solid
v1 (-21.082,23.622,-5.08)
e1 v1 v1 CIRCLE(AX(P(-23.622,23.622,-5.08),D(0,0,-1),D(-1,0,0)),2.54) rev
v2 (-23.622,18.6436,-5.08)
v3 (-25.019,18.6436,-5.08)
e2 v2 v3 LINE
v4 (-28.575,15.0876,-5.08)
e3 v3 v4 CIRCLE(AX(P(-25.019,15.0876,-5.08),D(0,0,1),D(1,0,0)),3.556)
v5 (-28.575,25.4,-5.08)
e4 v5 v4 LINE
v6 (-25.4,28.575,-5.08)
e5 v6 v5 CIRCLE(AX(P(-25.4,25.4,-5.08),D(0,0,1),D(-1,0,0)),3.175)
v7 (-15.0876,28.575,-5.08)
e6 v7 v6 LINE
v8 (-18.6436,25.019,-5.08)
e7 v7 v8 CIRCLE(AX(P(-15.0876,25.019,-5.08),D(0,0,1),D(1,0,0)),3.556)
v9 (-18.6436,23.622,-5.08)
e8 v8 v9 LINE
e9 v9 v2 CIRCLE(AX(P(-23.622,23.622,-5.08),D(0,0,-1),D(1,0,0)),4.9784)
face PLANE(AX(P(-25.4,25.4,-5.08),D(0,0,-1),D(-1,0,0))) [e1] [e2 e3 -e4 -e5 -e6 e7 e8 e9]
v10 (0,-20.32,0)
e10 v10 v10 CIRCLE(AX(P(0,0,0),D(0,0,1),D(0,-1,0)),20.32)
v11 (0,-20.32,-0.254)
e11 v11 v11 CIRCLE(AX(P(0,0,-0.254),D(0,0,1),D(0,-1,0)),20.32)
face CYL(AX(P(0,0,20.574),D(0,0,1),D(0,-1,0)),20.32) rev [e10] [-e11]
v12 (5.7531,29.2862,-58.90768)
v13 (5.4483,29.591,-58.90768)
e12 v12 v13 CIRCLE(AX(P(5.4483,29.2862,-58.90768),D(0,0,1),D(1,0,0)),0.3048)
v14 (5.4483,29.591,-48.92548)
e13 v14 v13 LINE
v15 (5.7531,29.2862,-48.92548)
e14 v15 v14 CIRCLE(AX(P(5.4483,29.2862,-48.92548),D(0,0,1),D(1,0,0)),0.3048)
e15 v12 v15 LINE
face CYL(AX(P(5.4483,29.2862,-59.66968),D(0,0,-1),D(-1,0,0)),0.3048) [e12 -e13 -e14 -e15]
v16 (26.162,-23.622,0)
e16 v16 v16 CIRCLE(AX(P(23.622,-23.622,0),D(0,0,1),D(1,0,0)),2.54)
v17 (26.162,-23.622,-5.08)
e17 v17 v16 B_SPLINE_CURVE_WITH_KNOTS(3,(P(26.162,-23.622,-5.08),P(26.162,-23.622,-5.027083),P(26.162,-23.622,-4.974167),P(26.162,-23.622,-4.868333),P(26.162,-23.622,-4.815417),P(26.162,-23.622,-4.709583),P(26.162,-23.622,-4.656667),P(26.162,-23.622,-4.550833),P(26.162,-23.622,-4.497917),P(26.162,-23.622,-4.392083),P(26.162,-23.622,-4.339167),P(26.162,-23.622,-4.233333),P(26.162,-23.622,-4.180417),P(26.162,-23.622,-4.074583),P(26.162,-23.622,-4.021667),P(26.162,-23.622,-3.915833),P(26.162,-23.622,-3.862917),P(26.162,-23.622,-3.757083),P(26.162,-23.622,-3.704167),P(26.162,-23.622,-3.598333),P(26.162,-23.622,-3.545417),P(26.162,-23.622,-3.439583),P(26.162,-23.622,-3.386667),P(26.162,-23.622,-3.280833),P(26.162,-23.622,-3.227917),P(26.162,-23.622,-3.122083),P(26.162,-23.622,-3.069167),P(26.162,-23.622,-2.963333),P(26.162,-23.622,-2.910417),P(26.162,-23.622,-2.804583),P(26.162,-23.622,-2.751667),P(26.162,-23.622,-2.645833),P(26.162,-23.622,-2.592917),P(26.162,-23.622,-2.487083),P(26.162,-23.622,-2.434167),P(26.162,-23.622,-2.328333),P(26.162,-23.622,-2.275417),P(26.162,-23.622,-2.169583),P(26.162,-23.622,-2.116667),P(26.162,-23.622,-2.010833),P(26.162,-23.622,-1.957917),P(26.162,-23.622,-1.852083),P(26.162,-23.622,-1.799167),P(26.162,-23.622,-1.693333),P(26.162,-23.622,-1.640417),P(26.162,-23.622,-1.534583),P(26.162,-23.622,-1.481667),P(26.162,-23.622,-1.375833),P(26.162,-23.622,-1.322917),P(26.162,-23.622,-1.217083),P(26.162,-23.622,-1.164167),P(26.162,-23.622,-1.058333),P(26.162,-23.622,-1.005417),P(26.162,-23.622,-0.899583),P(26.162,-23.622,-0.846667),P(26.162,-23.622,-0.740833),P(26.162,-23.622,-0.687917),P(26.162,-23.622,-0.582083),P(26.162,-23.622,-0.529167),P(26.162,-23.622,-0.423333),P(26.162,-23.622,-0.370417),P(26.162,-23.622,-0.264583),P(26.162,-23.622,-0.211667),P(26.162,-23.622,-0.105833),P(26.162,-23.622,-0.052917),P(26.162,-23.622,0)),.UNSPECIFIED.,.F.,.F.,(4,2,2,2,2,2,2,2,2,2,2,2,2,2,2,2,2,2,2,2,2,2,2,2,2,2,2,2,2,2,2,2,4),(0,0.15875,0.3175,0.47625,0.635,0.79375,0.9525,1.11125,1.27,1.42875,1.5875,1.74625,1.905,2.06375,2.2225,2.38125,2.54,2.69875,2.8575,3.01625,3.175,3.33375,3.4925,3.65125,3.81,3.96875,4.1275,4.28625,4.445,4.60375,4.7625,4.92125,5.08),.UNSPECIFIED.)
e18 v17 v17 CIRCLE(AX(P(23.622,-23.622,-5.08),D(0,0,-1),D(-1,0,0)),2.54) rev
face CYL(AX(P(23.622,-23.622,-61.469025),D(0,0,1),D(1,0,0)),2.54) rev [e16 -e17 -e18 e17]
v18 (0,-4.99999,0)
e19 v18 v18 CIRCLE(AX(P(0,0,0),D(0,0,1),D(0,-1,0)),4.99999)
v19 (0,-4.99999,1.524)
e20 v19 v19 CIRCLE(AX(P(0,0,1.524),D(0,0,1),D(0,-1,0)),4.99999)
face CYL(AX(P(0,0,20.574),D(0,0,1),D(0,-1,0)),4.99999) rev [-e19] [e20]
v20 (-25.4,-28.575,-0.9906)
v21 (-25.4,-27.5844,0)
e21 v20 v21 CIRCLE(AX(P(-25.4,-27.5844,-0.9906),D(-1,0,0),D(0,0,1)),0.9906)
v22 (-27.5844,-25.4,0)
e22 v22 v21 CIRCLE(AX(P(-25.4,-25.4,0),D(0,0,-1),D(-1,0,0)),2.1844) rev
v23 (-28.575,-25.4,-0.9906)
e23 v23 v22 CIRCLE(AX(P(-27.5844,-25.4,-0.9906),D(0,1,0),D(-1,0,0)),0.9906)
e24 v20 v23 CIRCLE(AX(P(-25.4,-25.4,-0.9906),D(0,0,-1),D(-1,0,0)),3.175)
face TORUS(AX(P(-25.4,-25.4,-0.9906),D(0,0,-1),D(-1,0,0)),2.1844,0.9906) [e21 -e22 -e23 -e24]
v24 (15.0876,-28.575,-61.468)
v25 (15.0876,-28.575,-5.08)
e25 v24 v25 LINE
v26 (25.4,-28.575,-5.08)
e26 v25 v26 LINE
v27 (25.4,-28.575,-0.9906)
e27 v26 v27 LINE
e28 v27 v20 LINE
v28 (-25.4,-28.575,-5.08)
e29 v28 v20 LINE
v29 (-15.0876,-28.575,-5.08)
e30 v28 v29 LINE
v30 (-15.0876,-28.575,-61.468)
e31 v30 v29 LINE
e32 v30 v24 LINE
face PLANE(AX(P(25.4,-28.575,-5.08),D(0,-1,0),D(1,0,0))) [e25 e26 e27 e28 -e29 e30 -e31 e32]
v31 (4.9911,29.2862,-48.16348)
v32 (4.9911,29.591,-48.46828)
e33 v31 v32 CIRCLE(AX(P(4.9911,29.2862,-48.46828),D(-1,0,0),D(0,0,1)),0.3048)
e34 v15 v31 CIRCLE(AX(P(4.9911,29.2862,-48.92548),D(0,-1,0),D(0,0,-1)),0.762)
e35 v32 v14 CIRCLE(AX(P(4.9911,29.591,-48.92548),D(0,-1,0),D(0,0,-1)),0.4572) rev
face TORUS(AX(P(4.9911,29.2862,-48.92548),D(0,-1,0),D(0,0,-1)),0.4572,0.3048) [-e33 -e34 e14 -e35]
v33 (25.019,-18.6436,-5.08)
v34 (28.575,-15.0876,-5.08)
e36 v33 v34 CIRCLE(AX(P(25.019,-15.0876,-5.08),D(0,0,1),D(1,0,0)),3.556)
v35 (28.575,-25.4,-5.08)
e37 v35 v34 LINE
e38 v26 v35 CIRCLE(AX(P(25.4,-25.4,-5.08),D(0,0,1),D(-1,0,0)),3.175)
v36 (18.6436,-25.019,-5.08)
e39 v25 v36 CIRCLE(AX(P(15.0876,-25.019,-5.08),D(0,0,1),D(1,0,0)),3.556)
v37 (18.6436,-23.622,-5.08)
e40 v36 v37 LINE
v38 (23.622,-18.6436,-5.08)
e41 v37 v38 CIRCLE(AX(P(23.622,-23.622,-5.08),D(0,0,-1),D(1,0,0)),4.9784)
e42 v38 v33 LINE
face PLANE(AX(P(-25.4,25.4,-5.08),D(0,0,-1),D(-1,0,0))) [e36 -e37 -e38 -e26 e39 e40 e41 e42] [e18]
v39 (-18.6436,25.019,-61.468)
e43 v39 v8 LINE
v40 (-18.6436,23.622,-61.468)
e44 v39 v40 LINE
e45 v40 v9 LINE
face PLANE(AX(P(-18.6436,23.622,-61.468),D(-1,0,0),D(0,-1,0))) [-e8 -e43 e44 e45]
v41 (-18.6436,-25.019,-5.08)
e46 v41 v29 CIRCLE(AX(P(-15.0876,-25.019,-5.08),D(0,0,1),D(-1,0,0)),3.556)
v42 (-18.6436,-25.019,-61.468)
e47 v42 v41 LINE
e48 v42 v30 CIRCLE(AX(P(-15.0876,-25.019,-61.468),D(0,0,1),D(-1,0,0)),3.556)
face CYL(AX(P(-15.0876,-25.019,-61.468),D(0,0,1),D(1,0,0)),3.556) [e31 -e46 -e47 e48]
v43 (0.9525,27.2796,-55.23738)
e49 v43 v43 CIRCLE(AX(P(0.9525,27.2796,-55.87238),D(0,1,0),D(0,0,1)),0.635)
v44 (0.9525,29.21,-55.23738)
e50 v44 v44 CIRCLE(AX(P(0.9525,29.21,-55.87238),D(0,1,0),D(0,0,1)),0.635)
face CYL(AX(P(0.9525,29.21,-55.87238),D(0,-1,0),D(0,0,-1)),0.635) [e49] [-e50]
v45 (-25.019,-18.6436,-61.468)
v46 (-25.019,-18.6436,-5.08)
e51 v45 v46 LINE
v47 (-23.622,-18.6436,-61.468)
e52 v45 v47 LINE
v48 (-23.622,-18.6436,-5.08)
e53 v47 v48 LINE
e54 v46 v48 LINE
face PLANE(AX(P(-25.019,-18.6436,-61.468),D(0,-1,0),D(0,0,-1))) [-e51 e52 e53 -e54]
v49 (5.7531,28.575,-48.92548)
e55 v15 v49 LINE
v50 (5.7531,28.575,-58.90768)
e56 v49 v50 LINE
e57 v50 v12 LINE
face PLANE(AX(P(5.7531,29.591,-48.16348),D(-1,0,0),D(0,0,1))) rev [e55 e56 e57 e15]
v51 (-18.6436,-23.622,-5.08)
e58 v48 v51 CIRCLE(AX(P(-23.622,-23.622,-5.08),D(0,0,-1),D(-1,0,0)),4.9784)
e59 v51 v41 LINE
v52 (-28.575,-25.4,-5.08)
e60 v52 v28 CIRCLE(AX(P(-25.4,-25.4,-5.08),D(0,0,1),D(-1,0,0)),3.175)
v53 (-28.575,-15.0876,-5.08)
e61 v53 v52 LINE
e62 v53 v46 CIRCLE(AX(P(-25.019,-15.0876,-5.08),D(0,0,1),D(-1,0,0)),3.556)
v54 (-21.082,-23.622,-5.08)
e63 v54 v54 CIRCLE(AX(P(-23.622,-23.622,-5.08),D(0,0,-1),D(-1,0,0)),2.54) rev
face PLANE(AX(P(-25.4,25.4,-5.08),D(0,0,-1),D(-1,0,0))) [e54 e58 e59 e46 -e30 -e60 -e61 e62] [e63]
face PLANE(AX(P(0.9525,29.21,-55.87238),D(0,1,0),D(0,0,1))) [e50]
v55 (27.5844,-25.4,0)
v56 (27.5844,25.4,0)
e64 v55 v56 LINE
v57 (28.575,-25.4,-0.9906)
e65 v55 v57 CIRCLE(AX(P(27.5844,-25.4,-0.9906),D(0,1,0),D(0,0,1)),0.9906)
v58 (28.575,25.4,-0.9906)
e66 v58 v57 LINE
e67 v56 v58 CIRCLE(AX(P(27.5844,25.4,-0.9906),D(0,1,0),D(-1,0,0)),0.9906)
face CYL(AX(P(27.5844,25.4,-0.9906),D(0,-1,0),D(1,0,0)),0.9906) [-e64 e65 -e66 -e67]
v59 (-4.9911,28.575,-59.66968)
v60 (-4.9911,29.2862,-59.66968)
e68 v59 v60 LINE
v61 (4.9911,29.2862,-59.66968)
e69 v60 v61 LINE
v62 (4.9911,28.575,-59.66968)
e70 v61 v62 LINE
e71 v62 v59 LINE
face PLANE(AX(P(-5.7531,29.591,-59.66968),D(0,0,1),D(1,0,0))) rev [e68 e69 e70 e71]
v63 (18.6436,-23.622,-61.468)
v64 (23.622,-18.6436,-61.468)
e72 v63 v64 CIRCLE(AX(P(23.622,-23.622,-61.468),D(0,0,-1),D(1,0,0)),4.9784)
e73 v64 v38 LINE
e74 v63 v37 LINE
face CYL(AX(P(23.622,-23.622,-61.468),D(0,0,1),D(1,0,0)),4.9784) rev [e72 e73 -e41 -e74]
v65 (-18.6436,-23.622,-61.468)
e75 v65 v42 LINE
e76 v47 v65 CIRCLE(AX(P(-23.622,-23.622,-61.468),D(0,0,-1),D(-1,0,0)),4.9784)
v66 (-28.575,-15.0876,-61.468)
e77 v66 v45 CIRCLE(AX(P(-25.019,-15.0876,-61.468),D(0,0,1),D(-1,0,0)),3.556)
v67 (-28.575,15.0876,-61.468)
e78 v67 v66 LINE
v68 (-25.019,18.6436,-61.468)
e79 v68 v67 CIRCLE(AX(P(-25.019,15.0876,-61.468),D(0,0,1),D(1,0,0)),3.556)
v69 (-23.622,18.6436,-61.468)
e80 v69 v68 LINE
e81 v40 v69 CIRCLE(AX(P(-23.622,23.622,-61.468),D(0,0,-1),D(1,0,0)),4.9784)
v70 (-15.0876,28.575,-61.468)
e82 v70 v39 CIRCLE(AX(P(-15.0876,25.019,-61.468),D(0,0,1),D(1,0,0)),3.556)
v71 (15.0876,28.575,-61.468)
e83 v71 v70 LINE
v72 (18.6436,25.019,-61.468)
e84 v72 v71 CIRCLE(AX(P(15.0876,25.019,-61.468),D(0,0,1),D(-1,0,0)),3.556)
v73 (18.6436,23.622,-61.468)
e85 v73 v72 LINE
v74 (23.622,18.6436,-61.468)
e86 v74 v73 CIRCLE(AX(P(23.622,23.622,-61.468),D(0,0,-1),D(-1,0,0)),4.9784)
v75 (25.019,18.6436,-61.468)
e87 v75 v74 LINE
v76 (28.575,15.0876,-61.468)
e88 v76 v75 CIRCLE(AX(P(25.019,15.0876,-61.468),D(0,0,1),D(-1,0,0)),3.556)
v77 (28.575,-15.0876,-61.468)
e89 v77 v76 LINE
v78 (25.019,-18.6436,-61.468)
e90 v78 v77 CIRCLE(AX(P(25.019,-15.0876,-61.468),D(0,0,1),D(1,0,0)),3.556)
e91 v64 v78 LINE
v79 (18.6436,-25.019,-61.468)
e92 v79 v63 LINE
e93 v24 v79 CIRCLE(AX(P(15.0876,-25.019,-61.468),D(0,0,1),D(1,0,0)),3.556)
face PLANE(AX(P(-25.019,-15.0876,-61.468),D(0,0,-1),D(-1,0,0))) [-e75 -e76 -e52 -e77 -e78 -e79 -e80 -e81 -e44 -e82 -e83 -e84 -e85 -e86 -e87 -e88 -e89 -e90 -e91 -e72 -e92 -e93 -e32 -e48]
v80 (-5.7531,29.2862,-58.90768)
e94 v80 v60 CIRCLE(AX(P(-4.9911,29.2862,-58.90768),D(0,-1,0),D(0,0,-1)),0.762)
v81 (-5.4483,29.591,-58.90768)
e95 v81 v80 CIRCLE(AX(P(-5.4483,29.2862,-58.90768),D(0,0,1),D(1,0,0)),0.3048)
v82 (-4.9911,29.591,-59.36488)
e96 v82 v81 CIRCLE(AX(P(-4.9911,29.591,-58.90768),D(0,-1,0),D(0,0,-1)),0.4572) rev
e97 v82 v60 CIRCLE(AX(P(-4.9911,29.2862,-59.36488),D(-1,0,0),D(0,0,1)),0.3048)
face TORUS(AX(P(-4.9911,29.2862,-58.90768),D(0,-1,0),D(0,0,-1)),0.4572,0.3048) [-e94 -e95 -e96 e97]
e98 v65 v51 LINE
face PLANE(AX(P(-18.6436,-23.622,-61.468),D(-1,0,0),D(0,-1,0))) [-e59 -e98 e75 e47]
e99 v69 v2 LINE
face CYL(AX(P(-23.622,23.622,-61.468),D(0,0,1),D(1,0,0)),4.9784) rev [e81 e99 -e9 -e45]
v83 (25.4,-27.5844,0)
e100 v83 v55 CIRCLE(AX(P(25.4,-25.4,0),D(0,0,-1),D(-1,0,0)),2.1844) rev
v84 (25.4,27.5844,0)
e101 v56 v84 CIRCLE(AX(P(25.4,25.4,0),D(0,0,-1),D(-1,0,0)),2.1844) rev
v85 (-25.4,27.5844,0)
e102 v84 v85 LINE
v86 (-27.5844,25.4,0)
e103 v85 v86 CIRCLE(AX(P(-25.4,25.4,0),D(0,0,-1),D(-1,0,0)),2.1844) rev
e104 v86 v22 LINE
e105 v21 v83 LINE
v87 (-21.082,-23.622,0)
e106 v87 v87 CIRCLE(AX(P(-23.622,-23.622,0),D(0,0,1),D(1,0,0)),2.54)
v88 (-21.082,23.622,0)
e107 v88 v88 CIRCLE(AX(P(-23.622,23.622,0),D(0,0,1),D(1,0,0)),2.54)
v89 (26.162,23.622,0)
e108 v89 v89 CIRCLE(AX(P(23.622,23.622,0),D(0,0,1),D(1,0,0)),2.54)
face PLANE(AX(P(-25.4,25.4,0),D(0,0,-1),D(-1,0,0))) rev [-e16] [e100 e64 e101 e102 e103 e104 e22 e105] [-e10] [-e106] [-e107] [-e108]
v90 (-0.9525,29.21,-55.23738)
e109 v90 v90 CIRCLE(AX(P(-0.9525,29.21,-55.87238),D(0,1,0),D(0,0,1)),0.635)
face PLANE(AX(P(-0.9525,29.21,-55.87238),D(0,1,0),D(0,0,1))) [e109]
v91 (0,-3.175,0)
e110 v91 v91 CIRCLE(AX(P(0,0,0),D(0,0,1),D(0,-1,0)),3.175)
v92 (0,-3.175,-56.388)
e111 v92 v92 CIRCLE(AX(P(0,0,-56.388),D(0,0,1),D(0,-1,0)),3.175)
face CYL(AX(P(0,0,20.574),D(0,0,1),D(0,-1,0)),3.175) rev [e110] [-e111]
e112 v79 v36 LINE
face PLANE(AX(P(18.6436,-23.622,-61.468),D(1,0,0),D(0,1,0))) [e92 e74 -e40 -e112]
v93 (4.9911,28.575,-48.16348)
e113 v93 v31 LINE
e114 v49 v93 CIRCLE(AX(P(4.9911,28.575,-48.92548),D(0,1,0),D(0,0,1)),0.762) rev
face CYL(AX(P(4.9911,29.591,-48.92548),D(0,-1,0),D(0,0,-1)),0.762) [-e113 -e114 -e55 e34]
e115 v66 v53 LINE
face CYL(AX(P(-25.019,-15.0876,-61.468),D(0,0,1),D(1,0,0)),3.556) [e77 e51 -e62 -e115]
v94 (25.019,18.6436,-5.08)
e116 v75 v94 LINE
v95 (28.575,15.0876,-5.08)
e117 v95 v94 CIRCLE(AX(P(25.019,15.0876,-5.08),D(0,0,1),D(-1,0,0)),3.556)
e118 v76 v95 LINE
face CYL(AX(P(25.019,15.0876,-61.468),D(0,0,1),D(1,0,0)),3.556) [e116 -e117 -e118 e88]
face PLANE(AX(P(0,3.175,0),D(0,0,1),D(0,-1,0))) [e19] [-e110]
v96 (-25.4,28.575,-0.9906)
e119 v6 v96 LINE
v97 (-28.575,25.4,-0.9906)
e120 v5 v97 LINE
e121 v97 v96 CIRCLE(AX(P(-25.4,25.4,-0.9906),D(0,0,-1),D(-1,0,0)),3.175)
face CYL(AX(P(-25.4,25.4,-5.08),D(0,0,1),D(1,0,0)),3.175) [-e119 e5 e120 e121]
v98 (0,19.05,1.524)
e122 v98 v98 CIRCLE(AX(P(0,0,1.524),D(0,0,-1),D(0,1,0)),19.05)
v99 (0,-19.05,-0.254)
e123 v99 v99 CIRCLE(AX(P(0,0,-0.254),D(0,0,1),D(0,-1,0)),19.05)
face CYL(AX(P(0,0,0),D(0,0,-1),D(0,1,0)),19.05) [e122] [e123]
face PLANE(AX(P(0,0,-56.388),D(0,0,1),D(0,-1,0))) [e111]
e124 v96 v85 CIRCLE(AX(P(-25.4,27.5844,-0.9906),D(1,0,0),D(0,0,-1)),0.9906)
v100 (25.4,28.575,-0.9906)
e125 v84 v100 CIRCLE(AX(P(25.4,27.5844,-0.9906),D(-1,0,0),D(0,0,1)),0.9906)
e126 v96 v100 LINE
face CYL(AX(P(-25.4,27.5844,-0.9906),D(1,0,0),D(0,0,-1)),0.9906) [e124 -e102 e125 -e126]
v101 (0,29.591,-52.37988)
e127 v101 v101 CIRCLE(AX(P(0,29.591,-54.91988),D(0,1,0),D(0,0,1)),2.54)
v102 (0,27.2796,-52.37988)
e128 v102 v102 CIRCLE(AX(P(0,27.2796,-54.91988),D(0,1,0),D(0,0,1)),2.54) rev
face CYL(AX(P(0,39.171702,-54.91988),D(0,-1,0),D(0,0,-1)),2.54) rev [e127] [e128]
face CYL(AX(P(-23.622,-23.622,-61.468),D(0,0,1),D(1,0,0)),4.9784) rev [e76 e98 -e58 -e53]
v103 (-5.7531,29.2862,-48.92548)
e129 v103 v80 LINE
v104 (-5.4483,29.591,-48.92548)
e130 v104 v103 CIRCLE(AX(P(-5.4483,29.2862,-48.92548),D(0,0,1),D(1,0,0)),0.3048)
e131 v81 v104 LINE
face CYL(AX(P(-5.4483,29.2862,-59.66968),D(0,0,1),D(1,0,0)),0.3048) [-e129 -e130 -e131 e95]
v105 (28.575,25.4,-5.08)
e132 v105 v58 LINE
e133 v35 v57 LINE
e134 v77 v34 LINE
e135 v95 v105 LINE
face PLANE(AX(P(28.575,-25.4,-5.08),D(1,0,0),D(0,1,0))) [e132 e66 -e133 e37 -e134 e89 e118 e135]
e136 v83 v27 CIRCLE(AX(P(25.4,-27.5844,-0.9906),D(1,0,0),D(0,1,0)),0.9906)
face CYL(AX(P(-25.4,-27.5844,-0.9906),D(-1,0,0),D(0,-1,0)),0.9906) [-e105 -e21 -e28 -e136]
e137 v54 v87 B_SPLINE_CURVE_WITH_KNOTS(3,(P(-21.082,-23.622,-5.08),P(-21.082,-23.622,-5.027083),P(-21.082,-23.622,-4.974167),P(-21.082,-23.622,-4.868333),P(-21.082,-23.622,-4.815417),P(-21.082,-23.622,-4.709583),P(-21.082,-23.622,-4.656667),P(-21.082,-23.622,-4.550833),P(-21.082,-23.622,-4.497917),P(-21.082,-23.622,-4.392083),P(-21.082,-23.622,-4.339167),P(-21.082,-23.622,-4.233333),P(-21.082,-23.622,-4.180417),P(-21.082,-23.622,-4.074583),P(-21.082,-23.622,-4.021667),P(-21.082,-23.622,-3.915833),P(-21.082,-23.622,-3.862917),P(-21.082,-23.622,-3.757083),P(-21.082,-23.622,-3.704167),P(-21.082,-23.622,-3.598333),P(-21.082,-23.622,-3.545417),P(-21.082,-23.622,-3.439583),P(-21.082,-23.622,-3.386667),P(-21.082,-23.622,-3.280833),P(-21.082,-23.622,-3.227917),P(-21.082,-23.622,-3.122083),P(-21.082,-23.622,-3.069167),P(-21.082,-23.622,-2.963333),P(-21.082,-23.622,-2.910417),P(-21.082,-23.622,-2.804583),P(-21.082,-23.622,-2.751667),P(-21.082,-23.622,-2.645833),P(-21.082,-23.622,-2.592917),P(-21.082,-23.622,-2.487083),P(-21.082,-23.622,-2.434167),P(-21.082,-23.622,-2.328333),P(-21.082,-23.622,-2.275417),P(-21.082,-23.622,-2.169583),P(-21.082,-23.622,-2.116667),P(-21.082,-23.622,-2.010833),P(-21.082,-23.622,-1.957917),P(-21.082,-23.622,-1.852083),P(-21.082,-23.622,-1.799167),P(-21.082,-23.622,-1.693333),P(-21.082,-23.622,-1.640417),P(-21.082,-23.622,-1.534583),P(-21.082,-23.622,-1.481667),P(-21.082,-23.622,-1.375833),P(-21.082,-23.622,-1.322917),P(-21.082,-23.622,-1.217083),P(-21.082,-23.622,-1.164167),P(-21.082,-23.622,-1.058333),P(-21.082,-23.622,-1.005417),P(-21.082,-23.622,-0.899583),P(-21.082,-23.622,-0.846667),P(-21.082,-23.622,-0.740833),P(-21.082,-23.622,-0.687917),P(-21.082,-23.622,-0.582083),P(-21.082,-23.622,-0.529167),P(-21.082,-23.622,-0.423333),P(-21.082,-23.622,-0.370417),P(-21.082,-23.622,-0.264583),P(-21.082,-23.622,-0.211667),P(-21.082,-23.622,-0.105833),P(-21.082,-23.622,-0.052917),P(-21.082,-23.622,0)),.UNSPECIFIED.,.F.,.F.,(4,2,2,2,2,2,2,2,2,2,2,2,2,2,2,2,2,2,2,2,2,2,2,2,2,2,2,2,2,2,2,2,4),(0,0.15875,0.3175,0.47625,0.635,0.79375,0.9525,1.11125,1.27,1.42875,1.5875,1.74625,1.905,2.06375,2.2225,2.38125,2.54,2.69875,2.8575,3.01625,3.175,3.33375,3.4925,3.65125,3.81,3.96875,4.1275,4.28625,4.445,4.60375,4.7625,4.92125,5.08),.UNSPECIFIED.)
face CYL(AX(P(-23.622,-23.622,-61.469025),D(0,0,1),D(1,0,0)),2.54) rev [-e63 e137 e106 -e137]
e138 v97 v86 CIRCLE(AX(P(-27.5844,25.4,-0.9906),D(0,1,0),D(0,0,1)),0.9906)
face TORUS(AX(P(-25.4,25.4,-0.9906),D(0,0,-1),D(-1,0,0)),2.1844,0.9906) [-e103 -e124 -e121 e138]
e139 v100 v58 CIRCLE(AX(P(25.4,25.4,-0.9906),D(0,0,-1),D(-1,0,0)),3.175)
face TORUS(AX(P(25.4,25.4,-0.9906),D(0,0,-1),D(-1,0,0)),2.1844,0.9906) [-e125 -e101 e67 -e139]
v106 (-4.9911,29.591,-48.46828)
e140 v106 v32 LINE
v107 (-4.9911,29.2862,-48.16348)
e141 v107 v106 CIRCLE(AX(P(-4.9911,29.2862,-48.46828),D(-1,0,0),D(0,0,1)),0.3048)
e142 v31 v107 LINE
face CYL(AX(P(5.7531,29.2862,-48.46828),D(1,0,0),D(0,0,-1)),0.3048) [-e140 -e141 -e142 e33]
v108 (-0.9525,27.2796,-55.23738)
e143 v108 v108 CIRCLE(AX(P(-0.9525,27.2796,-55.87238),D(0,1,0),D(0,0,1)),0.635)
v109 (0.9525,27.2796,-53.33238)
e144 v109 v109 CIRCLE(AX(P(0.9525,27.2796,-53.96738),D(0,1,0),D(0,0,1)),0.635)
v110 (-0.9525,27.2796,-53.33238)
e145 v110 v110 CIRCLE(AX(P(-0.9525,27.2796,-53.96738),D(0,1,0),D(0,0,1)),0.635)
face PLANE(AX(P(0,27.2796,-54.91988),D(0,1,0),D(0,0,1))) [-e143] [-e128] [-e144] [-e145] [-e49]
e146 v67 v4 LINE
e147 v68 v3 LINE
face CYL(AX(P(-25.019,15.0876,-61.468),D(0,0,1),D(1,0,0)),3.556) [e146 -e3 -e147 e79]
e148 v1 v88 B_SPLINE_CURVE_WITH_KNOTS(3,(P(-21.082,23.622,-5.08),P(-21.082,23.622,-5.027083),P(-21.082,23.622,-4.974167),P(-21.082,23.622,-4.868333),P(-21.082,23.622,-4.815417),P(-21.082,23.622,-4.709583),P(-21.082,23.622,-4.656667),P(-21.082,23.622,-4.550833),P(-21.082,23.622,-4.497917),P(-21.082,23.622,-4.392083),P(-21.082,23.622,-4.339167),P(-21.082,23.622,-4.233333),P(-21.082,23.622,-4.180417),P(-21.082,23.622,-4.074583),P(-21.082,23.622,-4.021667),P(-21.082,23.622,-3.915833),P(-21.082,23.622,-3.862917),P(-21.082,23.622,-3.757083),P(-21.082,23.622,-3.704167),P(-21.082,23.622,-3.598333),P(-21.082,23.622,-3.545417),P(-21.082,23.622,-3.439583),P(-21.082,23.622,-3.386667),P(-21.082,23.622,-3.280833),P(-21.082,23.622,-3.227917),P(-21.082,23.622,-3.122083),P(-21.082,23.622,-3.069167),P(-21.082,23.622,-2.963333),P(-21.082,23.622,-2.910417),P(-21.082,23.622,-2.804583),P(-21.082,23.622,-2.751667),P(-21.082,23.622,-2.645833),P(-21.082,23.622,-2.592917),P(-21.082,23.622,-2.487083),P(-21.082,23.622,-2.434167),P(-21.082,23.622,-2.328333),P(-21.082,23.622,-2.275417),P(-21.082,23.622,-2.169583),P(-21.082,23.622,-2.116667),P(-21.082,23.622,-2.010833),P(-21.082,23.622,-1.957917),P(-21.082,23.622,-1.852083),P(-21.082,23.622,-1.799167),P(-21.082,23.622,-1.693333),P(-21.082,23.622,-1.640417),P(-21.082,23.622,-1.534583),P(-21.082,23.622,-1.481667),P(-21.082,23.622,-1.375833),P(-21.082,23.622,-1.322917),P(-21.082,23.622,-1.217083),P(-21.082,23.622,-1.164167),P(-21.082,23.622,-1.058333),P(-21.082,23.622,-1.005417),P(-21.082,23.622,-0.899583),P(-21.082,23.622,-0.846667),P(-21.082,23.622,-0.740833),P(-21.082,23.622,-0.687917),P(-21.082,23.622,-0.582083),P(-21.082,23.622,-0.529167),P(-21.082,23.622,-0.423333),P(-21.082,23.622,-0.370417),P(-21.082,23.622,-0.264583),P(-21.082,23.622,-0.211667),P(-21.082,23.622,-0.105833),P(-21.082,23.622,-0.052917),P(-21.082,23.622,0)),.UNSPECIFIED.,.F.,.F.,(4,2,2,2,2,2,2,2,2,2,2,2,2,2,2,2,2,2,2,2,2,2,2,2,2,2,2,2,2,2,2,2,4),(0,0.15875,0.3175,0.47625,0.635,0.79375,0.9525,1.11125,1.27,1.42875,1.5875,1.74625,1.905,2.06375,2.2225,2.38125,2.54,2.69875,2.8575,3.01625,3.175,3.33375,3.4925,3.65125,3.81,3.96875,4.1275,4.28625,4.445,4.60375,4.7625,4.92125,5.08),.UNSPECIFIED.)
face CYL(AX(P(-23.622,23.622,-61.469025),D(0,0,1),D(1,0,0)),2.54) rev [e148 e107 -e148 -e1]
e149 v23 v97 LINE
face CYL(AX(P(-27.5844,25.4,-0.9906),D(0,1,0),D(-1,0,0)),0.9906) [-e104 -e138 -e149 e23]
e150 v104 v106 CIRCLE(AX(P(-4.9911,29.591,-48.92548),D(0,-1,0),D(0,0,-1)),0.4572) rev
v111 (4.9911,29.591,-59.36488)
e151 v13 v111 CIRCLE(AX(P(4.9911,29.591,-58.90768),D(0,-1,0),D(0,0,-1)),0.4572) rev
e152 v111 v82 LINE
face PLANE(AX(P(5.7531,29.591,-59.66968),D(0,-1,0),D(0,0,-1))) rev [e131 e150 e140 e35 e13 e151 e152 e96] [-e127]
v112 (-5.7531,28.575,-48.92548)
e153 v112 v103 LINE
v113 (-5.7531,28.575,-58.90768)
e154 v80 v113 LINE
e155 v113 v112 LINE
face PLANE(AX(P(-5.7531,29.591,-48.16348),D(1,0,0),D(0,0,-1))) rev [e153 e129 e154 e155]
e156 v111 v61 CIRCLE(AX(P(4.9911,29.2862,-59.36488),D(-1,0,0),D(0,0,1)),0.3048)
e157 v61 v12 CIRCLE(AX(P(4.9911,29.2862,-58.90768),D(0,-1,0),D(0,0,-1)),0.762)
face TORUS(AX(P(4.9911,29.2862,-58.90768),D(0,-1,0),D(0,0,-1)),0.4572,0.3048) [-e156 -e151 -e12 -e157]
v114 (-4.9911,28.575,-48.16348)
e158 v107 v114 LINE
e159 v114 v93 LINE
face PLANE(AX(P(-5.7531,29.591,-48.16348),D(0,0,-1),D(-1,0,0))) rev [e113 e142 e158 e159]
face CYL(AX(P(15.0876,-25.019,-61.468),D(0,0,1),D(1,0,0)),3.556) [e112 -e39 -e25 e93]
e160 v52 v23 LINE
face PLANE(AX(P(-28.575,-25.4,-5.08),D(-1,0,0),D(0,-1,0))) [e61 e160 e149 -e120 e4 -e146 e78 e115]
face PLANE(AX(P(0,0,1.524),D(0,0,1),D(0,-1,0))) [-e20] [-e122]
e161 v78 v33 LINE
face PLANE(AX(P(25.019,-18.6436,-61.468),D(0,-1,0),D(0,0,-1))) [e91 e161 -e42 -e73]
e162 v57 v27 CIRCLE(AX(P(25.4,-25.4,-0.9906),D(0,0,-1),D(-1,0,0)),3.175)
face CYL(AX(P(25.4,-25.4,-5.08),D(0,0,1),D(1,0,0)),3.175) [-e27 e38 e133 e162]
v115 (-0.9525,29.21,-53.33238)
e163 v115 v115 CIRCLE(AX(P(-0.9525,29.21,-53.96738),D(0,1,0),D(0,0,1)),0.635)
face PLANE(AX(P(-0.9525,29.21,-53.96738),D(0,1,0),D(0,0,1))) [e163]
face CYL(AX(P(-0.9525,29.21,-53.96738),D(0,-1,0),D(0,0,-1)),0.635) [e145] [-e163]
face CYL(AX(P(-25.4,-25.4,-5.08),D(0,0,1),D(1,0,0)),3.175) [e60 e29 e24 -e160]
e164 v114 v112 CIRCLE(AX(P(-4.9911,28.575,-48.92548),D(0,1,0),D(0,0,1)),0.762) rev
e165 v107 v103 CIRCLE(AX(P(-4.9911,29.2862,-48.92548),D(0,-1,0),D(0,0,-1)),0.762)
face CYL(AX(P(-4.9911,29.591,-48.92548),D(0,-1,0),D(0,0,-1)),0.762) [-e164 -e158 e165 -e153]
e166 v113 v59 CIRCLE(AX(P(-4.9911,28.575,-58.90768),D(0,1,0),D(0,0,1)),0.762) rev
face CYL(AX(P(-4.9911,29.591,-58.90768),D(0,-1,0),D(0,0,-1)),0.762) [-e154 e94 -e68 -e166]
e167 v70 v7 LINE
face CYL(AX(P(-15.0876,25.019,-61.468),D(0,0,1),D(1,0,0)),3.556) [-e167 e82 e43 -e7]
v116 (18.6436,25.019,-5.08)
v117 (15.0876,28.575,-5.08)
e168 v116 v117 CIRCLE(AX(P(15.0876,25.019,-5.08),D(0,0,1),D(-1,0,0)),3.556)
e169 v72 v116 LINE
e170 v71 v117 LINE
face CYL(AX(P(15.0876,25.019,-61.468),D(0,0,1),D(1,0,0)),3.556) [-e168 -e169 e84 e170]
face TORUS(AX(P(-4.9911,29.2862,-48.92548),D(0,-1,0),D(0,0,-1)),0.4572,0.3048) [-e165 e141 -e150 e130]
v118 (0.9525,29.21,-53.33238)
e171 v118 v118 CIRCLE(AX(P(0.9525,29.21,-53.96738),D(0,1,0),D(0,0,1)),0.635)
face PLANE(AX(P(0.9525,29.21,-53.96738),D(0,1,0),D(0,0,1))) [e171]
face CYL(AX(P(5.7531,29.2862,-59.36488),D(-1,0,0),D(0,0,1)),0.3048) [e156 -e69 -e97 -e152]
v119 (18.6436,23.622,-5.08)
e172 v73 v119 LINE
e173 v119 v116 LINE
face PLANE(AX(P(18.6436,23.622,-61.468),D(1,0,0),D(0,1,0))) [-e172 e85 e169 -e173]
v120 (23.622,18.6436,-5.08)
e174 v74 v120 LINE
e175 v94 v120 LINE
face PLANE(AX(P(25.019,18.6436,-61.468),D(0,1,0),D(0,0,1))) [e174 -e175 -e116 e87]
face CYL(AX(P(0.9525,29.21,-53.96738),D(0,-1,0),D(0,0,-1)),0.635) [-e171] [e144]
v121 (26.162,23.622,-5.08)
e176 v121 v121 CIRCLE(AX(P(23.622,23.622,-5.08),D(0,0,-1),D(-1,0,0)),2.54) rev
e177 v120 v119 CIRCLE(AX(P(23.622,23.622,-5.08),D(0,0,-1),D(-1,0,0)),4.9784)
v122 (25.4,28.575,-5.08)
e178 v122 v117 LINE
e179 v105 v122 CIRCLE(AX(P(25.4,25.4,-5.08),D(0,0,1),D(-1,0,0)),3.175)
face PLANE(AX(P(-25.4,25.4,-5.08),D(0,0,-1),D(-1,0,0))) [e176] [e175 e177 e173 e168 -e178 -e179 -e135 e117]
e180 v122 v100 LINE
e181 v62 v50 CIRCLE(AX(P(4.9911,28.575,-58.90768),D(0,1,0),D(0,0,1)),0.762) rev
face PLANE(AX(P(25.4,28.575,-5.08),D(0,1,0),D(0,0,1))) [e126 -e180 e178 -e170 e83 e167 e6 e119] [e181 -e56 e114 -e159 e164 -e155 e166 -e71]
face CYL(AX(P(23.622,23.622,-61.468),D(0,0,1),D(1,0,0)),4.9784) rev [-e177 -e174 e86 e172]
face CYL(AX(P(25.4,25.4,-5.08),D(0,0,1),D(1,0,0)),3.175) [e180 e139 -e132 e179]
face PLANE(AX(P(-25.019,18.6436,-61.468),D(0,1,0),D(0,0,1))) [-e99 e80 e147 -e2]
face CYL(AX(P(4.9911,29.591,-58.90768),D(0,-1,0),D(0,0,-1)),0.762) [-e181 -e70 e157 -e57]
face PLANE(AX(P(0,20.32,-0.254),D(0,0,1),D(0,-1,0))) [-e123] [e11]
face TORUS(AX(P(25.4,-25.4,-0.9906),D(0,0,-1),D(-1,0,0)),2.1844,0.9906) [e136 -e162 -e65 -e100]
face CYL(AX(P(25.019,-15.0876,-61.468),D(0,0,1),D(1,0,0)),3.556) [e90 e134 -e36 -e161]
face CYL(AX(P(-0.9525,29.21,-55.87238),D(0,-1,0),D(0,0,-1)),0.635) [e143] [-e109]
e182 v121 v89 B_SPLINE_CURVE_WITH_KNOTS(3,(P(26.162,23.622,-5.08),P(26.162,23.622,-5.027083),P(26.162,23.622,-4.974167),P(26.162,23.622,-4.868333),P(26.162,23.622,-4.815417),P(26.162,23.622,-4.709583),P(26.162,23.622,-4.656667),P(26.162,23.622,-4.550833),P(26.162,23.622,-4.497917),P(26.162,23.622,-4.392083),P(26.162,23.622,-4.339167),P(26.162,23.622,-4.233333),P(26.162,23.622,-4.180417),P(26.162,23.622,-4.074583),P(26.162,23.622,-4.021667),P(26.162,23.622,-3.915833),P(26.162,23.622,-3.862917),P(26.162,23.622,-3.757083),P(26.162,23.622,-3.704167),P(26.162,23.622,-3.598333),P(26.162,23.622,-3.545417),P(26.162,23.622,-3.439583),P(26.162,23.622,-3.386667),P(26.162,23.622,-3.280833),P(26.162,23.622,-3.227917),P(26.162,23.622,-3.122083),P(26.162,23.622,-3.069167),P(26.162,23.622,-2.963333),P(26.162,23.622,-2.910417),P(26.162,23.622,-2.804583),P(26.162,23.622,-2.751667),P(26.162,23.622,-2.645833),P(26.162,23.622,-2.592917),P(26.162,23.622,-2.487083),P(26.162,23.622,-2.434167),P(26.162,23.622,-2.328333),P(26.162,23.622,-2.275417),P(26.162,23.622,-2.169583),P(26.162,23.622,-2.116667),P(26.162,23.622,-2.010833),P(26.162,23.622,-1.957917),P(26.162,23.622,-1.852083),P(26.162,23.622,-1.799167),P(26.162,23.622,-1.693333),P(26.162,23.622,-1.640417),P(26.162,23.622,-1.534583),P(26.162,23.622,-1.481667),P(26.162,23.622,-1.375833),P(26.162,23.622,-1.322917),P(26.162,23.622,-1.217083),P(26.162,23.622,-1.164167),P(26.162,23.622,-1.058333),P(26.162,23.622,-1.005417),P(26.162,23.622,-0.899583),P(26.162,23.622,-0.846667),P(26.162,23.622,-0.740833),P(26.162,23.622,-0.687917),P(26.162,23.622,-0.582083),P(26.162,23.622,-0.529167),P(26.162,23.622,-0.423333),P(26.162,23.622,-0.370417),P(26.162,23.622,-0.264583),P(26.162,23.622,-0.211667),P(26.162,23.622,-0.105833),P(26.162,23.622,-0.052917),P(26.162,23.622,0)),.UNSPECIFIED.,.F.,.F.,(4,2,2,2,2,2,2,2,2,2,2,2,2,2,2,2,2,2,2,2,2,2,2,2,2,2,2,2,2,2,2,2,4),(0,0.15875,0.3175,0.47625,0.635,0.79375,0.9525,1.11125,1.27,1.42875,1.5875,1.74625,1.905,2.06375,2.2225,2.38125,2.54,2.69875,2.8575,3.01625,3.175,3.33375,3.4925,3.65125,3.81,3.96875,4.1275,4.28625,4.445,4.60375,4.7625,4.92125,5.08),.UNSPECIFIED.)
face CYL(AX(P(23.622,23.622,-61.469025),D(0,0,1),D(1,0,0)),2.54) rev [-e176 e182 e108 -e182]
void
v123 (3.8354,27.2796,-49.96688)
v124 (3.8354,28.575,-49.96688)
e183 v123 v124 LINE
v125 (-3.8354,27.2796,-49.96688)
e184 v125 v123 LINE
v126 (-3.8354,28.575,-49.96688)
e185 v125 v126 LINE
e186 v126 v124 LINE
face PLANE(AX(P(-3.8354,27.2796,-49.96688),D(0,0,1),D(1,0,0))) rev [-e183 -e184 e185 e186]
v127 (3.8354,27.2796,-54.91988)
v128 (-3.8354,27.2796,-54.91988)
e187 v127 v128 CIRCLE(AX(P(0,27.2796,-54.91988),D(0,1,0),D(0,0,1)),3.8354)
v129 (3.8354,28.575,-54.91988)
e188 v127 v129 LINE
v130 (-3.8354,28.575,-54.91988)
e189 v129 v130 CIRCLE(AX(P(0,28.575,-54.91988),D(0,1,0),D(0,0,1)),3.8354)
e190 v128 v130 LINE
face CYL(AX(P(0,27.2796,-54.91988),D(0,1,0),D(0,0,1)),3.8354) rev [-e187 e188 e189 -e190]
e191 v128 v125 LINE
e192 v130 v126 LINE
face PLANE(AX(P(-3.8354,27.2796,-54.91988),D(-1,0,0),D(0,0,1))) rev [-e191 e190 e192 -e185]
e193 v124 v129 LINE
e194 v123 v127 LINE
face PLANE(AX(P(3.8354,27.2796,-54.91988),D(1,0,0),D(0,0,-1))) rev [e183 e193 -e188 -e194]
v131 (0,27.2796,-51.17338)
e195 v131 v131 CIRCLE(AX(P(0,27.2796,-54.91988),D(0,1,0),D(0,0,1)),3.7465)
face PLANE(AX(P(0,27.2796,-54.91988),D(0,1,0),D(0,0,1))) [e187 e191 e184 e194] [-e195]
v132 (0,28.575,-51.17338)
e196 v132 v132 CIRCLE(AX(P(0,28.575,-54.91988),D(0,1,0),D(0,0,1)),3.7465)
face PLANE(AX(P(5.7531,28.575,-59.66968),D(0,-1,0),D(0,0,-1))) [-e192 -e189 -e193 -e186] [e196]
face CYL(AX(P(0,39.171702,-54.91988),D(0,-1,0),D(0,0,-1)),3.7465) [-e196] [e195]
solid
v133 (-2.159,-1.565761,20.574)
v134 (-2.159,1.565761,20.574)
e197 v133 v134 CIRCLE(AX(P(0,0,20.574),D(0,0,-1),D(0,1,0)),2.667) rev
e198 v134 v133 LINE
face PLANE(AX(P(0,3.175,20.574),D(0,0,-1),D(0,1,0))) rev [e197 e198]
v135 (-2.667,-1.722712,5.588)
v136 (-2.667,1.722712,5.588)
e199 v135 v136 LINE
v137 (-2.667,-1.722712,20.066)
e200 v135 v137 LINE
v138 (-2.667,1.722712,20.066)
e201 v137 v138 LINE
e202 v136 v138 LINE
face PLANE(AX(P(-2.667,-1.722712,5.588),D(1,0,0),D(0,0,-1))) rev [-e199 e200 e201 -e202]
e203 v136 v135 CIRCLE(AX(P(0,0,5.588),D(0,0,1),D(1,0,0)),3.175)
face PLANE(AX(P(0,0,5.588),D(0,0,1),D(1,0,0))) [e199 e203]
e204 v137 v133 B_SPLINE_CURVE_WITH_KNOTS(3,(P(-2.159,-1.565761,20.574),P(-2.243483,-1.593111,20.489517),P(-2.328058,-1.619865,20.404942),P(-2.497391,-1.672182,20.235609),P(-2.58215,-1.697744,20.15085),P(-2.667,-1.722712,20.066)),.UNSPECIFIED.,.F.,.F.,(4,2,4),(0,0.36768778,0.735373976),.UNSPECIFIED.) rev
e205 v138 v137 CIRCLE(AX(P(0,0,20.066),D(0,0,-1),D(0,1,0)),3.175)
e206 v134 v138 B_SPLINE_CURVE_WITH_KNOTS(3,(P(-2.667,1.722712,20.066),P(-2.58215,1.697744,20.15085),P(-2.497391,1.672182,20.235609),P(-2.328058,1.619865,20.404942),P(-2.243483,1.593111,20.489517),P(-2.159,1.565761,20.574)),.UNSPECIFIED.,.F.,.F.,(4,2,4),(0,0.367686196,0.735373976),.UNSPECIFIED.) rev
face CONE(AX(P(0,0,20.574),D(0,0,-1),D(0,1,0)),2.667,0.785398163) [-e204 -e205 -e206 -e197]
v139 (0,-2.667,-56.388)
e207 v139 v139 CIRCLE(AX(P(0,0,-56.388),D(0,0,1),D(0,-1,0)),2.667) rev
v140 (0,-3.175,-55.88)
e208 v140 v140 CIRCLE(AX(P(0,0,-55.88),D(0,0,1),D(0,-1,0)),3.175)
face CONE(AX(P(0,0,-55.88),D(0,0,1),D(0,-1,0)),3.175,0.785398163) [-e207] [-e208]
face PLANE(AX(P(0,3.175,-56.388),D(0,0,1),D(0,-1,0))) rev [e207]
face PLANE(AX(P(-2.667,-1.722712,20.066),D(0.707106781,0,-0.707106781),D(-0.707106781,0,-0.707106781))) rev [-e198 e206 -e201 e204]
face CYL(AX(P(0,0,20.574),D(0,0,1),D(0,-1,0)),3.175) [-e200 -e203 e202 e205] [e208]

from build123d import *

# Parameters (mm, degrees)
BOSS_EXTRUDE1_DEPTH = 5.08
FILLET1_R           = 0.9906
BOSS_EXTRUDE2_DEPTH = 56.388
SKETCH5_W           = 1.524
SKETCH5_H           = 19.05
SKETCH6_W           = 0.254
SKETCH6_H           = 1.27
SKETCH7_W           = 76.962
SKETCH7_H           = 3.175
CUT_EXTRUDE1_START  = -14.986
CUT_EXTRUDE1_DEPTH  = 14.986
CHAMFER1_SIZE       = 0.508
SKETCH9_R           = 2.54
CUT_EXTRUDE2_DEPTH  = 5.08
CUT_EXTRUDE3_DEPTH  = 1.2954
SKETCH11_R          = 3.7465
SKETCH11_R_2        = 2.54
BOSS_EXTRUDE3_DEPTH = 1.2954
SKETCH12_W          = 11.5062
SKETCH12_H          = 11.5062
SKETCH12_R          = 2.54
BOSS_EXTRUDE4_DEPTH = 1.016
FILLET2_R           = 0.762
FILLET3_R           = 0.3048
SKETCH13_R          = 0.635
BOSS_EXTRUDE5_DEPTH = 1.9304


with BuildPart() as part:
    # Sketch3 → Boss-Extrude1 (new body)
    with BuildSketch(Plane.XY):
        with BuildLine():
            Line((-28.575, -25.4), (-28.575, 25.4))
            ThreePointArc((-28.575, 25.4), (-27.64506403, 27.64506403), (-25.4, 28.575))
            Line((-25.4, 28.575), (25.4, 28.575))
            ThreePointArc((25.4, 28.575), (27.64506403, 27.64506403), (28.575, 25.4))
            Line((28.575, 25.4), (28.575, -25.4))
            ThreePointArc((28.575, -25.4), (27.64506403, -27.64506403), (25.4, -28.575))
            Line((25.4, -28.575), (-25.4, -28.575))
            ThreePointArc((-25.4, -28.575), (-27.64506403, -27.64506403), (-28.575, -25.4))
        make_face()
    extrude(amount=-BOSS_EXTRUDE1_DEPTH)

    # Fillet1
    fillet1_edges = [part.edges().sort_by_distance(p)[0] for p in [
        (-28.575, 0, 0),
        (-27.64506403, 27.64506403, 0),
        (0, 28.575, 0),
        (27.64506403, 27.64506403, 0),
        (28.575, 0, 0),
        (27.64506403, -27.64506403, 0),
        (0, -28.575, 0),
        (-27.64506403, -27.64506403, 0),
    ]]
    fillet(fillet1_edges, radius=FILLET1_R)

    # Sketch4 → Boss-Extrude2 (add)
    with BuildSketch(Plane.XY.offset(-5.08)):
        with BuildLine():
            Line((-25.019, 18.6436), (-23.622, 18.6436))
            ThreePointArc((-23.622, 18.6436), (-20.101739601, 20.101739601), (-18.6436, 23.622))
            Line((-18.6436, 23.622), (-18.6436, 25.019))
            ThreePointArc((-18.6436, 25.019), (-17.602071714, 27.533471714), (-15.0876, 28.575))
            Line((-15.0876, 28.575), (15.0876, 28.575))
            ThreePointArc((15.0876, 28.575), (17.602071714, 27.533471714), (18.6436, 25.019))
            Line((18.6436, 25.019), (18.6436, 23.622))
            ThreePointArc((18.6436, 23.622), (20.101739601, 20.101739601), (23.622, 18.6436))
            Line((23.622, 18.6436), (25.019, 18.6436))
            ThreePointArc((25.019, 18.6436), (27.533471714, 17.602071714), (28.575, 15.0876))
            Line((28.575, 15.0876), (28.575, -15.0876))
            ThreePointArc((28.575, -15.0876), (27.533471714, -17.602071714), (25.019, -18.6436))
            Line((25.019, -18.6436), (23.622, -18.6436))
            ThreePointArc((23.622, -18.6436), (20.101739601, -20.101739601), (18.6436, -23.622))
            Line((18.6436, -23.622), (18.6436, -25.019))
            ThreePointArc((18.6436, -25.019), (17.602071714, -27.533471714), (15.0876, -28.575))
            Line((15.0876, -28.575), (-15.0876, -28.575))
            ThreePointArc((-15.0876, -28.575), (-17.602071714, -27.533471714), (-18.6436, -25.019))
            Line((-18.6436, -25.019), (-18.6436, -23.622))
            ThreePointArc((-18.6436, -23.622), (-20.101739601, -20.101739601), (-23.622, -18.6436))
            Line((-23.622, -18.6436), (-25.019, -18.6436))
            ThreePointArc((-25.019, -18.6436), (-27.533471714, -17.602071714), (-28.575, -15.0876))
            Line((-28.575, -15.0876), (-28.575, 15.0876))
            ThreePointArc((-28.575, 15.0876), (-27.533471714, 17.602071714), (-25.019, 18.6436))
        make_face()
    extrude(amount=-BOSS_EXTRUDE2_DEPTH)

    # Sketch5 → Revolve1 (revolve)
    with BuildSketch(Plane(origin=(0, 0, 0), x_dir=(0, 0, -1), z_dir=(1, 0, 0))):
        with Locations((-0.762, 9.525)):
            Rectangle(SKETCH5_W, SKETCH5_H)
    revolve(axis=Axis((0, 0, 0), (0, 0, 1)))

    # Sketch6 → Cut-Revolve1 (revolve, cut)
    with BuildSketch(Plane(origin=(0, 0, 0), x_dir=(0, 0, -1), z_dir=(1, 0, 0)), mode=Mode.PRIVATE) as cut_revolve1_sk:
        Polygon((56.388, 0), (-1.524, 0), (-1.524, 4.99999), (0, 4.99999), (0, 3.175), (56.388, 3.175), align=None)
        with Locations((0.127, 19.685)):
            Rectangle(SKETCH6_W, SKETCH6_H)
    revolve(cut_revolve1_sk.sketch.rotate(Axis((0, 0, 20.574), (0, 0, -1)), 180), axis=Axis((0, 0, 20.574), (0, 0, -1)), mode=Mode.SUBTRACT)

    # Sketch9 → Cut-Extrude2 (cut)
    with BuildSketch(Plane.XY):
        with Locations((23.622, -23.622)):
            Circle(SKETCH9_R)
        with Locations((-23.622, -23.622)):
            Circle(SKETCH9_R)
        with Locations((-23.622, 23.622)):
            Circle(SKETCH9_R)
        with Locations((23.622, 23.622)):
            Circle(SKETCH9_R)
    extrude(amount=-CUT_EXTRUDE2_DEPTH, mode=Mode.SUBTRACT)

    # Sketch10 → Cut-Extrude3 (cut)
    with BuildSketch(Plane(origin=(0, 28.575, -0.751200197), x_dir=(1, 0, 0), z_dir=(0, 1, 0))):
        with BuildLine():
            Line((-3.8354, 54.168679803), (-3.8354, 49.215679803))
            Line((-3.8354, 49.215679803), (3.8354, 49.215679803))
            Line((3.8354, 49.215679803), (3.8354, 54.168679803))
            ThreePointArc((3.8354, 54.168679803), (0, 58.004079803), (-3.8354, 54.168679803))
        make_face()
    extrude(amount=-CUT_EXTRUDE3_DEPTH, mode=Mode.SUBTRACT)

    # Sketch11 → Boss-Extrude3 (add)
    with BuildSketch(Plane(origin=(0, 27.2796, 0), x_dir=(1, 0, 0), z_dir=(0, 1, 0))):
        with Locations(Location((0, 54.91988, 0), (0, 0, 270))):
            Circle(SKETCH11_R)
        with Locations(Location((0, 54.91988, 0), (0, 0, 270))):
            Circle(SKETCH11_R_2, mode=Mode.SUBTRACT)
    extrude(amount=BOSS_EXTRUDE3_DEPTH)

    # Sketch12 → Boss-Extrude4 (add)
    with BuildSketch(Plane(origin=(0, 28.575, 0), x_dir=(1, 0, 0), z_dir=(0, 1, 0))):
        with Locations((0, 53.91658)):
            Rectangle(SKETCH12_W, SKETCH12_H)
        with Locations(Location((0, 54.91988, 0), (0, 0, 270))):
            Circle(SKETCH12_R, mode=Mode.SUBTRACT)
    extrude(amount=BOSS_EXTRUDE4_DEPTH)

    # Fillet2
    fillet2_edges = [part.edges().sort_by_distance(p)[0] for p in [
        (5.7531, 29.083, -48.16348),
        (5.7531, 29.083, -59.66968),
        (-5.7531, 29.083, -59.66968),
        (-5.7531, 29.083, -48.16348),
    ]]
    fillet(fillet2_edges, radius=FILLET2_R)

    # Fillet3
    fillet3_edges = [part.edges().sort_by_distance(p)[0] for p in [
        (0, 29.591, -59.66968),
        (5.7531, 29.591, -53.91658),
        (-5.7531, 29.591, -53.91658),
        (0, 29.591, -48.16348),
        (-5.529915367, 29.591, -48.386664633),
        (5.529915367, 29.591, -48.386664633),
        (-5.529915367, 29.591, -59.446495367),
        (5.529915367, 29.591, -59.446495367),
    ]]
    fillet(fillet3_edges, radius=FILLET3_R)

    # Sketch13 → Boss-Extrude5 (add)
    with BuildSketch(Plane(origin=(0, 27.2796, 0), x_dir=(1, 0, 0), z_dir=(0, 1, 0))):
        with Locations(Location((-0.9525, 55.87238, 0), (0, 0, 270))):
            Circle(SKETCH13_R)
        with Locations(Location((0.9525, 55.87238, 0), (0, 0, 270))):
            Circle(SKETCH13_R)
        with Locations(Location((0.9525, 53.96738, 0), (0, 0, 270))):
            Circle(SKETCH13_R)
        with Locations(Location((-0.9525, 53.96738, 0), (0, 0, 270))):
            Circle(SKETCH13_R)
    extrude(amount=BOSS_EXTRUDE5_DEPTH)


with BuildPart() as body_2:
    # Sketch7 → Revolve2 (revolve)
    with BuildSketch(Plane(origin=(0, 0, 0), x_dir=(0, 0, -1), z_dir=(1, 0, 0)), mode=Mode.PRIVATE) as revolve2_sk:
        with Locations((17.907, 1.5875)):
            Rectangle(SKETCH7_W, SKETCH7_H)
    revolve(revolve2_sk.sketch.rotate(Axis((0, 0, 20.574), (0, 0, -1)), 180), axis=Axis((0, 0, 20.574), (0, 0, -1)))

    # Sketch8 → Cut-Extrude1 (cut)
    with BuildSketch(Plane.XY.offset(20.574).offset(CUT_EXTRUDE1_START)):
        with BuildLine():
            Line((-2.667, -1.722711816), (-2.667, 1.722711816))
            ThreePointArc((-2.667, 1.722711816), (-3.175, 0), (-2.667, -1.722711816))
        make_face()
    extrude(amount=CUT_EXTRUDE1_DEPTH, mode=Mode.SUBTRACT)

    # Chamfer1
    chamfer1_edges = [body_2.edges().sort_by_distance(p)[0] for p in [
        (-2.667, 0, 20.574),
        (0, 3.175, -56.388),
        (2.78838977, 1.51838977, 20.574),
    ]]
    chamfer(chamfer1_edges, length=CHAMFER1_SIZE - 0.0001)  # a hair under: the kernel refuses the full size


solid = Compound([part.part, body_2.part])
